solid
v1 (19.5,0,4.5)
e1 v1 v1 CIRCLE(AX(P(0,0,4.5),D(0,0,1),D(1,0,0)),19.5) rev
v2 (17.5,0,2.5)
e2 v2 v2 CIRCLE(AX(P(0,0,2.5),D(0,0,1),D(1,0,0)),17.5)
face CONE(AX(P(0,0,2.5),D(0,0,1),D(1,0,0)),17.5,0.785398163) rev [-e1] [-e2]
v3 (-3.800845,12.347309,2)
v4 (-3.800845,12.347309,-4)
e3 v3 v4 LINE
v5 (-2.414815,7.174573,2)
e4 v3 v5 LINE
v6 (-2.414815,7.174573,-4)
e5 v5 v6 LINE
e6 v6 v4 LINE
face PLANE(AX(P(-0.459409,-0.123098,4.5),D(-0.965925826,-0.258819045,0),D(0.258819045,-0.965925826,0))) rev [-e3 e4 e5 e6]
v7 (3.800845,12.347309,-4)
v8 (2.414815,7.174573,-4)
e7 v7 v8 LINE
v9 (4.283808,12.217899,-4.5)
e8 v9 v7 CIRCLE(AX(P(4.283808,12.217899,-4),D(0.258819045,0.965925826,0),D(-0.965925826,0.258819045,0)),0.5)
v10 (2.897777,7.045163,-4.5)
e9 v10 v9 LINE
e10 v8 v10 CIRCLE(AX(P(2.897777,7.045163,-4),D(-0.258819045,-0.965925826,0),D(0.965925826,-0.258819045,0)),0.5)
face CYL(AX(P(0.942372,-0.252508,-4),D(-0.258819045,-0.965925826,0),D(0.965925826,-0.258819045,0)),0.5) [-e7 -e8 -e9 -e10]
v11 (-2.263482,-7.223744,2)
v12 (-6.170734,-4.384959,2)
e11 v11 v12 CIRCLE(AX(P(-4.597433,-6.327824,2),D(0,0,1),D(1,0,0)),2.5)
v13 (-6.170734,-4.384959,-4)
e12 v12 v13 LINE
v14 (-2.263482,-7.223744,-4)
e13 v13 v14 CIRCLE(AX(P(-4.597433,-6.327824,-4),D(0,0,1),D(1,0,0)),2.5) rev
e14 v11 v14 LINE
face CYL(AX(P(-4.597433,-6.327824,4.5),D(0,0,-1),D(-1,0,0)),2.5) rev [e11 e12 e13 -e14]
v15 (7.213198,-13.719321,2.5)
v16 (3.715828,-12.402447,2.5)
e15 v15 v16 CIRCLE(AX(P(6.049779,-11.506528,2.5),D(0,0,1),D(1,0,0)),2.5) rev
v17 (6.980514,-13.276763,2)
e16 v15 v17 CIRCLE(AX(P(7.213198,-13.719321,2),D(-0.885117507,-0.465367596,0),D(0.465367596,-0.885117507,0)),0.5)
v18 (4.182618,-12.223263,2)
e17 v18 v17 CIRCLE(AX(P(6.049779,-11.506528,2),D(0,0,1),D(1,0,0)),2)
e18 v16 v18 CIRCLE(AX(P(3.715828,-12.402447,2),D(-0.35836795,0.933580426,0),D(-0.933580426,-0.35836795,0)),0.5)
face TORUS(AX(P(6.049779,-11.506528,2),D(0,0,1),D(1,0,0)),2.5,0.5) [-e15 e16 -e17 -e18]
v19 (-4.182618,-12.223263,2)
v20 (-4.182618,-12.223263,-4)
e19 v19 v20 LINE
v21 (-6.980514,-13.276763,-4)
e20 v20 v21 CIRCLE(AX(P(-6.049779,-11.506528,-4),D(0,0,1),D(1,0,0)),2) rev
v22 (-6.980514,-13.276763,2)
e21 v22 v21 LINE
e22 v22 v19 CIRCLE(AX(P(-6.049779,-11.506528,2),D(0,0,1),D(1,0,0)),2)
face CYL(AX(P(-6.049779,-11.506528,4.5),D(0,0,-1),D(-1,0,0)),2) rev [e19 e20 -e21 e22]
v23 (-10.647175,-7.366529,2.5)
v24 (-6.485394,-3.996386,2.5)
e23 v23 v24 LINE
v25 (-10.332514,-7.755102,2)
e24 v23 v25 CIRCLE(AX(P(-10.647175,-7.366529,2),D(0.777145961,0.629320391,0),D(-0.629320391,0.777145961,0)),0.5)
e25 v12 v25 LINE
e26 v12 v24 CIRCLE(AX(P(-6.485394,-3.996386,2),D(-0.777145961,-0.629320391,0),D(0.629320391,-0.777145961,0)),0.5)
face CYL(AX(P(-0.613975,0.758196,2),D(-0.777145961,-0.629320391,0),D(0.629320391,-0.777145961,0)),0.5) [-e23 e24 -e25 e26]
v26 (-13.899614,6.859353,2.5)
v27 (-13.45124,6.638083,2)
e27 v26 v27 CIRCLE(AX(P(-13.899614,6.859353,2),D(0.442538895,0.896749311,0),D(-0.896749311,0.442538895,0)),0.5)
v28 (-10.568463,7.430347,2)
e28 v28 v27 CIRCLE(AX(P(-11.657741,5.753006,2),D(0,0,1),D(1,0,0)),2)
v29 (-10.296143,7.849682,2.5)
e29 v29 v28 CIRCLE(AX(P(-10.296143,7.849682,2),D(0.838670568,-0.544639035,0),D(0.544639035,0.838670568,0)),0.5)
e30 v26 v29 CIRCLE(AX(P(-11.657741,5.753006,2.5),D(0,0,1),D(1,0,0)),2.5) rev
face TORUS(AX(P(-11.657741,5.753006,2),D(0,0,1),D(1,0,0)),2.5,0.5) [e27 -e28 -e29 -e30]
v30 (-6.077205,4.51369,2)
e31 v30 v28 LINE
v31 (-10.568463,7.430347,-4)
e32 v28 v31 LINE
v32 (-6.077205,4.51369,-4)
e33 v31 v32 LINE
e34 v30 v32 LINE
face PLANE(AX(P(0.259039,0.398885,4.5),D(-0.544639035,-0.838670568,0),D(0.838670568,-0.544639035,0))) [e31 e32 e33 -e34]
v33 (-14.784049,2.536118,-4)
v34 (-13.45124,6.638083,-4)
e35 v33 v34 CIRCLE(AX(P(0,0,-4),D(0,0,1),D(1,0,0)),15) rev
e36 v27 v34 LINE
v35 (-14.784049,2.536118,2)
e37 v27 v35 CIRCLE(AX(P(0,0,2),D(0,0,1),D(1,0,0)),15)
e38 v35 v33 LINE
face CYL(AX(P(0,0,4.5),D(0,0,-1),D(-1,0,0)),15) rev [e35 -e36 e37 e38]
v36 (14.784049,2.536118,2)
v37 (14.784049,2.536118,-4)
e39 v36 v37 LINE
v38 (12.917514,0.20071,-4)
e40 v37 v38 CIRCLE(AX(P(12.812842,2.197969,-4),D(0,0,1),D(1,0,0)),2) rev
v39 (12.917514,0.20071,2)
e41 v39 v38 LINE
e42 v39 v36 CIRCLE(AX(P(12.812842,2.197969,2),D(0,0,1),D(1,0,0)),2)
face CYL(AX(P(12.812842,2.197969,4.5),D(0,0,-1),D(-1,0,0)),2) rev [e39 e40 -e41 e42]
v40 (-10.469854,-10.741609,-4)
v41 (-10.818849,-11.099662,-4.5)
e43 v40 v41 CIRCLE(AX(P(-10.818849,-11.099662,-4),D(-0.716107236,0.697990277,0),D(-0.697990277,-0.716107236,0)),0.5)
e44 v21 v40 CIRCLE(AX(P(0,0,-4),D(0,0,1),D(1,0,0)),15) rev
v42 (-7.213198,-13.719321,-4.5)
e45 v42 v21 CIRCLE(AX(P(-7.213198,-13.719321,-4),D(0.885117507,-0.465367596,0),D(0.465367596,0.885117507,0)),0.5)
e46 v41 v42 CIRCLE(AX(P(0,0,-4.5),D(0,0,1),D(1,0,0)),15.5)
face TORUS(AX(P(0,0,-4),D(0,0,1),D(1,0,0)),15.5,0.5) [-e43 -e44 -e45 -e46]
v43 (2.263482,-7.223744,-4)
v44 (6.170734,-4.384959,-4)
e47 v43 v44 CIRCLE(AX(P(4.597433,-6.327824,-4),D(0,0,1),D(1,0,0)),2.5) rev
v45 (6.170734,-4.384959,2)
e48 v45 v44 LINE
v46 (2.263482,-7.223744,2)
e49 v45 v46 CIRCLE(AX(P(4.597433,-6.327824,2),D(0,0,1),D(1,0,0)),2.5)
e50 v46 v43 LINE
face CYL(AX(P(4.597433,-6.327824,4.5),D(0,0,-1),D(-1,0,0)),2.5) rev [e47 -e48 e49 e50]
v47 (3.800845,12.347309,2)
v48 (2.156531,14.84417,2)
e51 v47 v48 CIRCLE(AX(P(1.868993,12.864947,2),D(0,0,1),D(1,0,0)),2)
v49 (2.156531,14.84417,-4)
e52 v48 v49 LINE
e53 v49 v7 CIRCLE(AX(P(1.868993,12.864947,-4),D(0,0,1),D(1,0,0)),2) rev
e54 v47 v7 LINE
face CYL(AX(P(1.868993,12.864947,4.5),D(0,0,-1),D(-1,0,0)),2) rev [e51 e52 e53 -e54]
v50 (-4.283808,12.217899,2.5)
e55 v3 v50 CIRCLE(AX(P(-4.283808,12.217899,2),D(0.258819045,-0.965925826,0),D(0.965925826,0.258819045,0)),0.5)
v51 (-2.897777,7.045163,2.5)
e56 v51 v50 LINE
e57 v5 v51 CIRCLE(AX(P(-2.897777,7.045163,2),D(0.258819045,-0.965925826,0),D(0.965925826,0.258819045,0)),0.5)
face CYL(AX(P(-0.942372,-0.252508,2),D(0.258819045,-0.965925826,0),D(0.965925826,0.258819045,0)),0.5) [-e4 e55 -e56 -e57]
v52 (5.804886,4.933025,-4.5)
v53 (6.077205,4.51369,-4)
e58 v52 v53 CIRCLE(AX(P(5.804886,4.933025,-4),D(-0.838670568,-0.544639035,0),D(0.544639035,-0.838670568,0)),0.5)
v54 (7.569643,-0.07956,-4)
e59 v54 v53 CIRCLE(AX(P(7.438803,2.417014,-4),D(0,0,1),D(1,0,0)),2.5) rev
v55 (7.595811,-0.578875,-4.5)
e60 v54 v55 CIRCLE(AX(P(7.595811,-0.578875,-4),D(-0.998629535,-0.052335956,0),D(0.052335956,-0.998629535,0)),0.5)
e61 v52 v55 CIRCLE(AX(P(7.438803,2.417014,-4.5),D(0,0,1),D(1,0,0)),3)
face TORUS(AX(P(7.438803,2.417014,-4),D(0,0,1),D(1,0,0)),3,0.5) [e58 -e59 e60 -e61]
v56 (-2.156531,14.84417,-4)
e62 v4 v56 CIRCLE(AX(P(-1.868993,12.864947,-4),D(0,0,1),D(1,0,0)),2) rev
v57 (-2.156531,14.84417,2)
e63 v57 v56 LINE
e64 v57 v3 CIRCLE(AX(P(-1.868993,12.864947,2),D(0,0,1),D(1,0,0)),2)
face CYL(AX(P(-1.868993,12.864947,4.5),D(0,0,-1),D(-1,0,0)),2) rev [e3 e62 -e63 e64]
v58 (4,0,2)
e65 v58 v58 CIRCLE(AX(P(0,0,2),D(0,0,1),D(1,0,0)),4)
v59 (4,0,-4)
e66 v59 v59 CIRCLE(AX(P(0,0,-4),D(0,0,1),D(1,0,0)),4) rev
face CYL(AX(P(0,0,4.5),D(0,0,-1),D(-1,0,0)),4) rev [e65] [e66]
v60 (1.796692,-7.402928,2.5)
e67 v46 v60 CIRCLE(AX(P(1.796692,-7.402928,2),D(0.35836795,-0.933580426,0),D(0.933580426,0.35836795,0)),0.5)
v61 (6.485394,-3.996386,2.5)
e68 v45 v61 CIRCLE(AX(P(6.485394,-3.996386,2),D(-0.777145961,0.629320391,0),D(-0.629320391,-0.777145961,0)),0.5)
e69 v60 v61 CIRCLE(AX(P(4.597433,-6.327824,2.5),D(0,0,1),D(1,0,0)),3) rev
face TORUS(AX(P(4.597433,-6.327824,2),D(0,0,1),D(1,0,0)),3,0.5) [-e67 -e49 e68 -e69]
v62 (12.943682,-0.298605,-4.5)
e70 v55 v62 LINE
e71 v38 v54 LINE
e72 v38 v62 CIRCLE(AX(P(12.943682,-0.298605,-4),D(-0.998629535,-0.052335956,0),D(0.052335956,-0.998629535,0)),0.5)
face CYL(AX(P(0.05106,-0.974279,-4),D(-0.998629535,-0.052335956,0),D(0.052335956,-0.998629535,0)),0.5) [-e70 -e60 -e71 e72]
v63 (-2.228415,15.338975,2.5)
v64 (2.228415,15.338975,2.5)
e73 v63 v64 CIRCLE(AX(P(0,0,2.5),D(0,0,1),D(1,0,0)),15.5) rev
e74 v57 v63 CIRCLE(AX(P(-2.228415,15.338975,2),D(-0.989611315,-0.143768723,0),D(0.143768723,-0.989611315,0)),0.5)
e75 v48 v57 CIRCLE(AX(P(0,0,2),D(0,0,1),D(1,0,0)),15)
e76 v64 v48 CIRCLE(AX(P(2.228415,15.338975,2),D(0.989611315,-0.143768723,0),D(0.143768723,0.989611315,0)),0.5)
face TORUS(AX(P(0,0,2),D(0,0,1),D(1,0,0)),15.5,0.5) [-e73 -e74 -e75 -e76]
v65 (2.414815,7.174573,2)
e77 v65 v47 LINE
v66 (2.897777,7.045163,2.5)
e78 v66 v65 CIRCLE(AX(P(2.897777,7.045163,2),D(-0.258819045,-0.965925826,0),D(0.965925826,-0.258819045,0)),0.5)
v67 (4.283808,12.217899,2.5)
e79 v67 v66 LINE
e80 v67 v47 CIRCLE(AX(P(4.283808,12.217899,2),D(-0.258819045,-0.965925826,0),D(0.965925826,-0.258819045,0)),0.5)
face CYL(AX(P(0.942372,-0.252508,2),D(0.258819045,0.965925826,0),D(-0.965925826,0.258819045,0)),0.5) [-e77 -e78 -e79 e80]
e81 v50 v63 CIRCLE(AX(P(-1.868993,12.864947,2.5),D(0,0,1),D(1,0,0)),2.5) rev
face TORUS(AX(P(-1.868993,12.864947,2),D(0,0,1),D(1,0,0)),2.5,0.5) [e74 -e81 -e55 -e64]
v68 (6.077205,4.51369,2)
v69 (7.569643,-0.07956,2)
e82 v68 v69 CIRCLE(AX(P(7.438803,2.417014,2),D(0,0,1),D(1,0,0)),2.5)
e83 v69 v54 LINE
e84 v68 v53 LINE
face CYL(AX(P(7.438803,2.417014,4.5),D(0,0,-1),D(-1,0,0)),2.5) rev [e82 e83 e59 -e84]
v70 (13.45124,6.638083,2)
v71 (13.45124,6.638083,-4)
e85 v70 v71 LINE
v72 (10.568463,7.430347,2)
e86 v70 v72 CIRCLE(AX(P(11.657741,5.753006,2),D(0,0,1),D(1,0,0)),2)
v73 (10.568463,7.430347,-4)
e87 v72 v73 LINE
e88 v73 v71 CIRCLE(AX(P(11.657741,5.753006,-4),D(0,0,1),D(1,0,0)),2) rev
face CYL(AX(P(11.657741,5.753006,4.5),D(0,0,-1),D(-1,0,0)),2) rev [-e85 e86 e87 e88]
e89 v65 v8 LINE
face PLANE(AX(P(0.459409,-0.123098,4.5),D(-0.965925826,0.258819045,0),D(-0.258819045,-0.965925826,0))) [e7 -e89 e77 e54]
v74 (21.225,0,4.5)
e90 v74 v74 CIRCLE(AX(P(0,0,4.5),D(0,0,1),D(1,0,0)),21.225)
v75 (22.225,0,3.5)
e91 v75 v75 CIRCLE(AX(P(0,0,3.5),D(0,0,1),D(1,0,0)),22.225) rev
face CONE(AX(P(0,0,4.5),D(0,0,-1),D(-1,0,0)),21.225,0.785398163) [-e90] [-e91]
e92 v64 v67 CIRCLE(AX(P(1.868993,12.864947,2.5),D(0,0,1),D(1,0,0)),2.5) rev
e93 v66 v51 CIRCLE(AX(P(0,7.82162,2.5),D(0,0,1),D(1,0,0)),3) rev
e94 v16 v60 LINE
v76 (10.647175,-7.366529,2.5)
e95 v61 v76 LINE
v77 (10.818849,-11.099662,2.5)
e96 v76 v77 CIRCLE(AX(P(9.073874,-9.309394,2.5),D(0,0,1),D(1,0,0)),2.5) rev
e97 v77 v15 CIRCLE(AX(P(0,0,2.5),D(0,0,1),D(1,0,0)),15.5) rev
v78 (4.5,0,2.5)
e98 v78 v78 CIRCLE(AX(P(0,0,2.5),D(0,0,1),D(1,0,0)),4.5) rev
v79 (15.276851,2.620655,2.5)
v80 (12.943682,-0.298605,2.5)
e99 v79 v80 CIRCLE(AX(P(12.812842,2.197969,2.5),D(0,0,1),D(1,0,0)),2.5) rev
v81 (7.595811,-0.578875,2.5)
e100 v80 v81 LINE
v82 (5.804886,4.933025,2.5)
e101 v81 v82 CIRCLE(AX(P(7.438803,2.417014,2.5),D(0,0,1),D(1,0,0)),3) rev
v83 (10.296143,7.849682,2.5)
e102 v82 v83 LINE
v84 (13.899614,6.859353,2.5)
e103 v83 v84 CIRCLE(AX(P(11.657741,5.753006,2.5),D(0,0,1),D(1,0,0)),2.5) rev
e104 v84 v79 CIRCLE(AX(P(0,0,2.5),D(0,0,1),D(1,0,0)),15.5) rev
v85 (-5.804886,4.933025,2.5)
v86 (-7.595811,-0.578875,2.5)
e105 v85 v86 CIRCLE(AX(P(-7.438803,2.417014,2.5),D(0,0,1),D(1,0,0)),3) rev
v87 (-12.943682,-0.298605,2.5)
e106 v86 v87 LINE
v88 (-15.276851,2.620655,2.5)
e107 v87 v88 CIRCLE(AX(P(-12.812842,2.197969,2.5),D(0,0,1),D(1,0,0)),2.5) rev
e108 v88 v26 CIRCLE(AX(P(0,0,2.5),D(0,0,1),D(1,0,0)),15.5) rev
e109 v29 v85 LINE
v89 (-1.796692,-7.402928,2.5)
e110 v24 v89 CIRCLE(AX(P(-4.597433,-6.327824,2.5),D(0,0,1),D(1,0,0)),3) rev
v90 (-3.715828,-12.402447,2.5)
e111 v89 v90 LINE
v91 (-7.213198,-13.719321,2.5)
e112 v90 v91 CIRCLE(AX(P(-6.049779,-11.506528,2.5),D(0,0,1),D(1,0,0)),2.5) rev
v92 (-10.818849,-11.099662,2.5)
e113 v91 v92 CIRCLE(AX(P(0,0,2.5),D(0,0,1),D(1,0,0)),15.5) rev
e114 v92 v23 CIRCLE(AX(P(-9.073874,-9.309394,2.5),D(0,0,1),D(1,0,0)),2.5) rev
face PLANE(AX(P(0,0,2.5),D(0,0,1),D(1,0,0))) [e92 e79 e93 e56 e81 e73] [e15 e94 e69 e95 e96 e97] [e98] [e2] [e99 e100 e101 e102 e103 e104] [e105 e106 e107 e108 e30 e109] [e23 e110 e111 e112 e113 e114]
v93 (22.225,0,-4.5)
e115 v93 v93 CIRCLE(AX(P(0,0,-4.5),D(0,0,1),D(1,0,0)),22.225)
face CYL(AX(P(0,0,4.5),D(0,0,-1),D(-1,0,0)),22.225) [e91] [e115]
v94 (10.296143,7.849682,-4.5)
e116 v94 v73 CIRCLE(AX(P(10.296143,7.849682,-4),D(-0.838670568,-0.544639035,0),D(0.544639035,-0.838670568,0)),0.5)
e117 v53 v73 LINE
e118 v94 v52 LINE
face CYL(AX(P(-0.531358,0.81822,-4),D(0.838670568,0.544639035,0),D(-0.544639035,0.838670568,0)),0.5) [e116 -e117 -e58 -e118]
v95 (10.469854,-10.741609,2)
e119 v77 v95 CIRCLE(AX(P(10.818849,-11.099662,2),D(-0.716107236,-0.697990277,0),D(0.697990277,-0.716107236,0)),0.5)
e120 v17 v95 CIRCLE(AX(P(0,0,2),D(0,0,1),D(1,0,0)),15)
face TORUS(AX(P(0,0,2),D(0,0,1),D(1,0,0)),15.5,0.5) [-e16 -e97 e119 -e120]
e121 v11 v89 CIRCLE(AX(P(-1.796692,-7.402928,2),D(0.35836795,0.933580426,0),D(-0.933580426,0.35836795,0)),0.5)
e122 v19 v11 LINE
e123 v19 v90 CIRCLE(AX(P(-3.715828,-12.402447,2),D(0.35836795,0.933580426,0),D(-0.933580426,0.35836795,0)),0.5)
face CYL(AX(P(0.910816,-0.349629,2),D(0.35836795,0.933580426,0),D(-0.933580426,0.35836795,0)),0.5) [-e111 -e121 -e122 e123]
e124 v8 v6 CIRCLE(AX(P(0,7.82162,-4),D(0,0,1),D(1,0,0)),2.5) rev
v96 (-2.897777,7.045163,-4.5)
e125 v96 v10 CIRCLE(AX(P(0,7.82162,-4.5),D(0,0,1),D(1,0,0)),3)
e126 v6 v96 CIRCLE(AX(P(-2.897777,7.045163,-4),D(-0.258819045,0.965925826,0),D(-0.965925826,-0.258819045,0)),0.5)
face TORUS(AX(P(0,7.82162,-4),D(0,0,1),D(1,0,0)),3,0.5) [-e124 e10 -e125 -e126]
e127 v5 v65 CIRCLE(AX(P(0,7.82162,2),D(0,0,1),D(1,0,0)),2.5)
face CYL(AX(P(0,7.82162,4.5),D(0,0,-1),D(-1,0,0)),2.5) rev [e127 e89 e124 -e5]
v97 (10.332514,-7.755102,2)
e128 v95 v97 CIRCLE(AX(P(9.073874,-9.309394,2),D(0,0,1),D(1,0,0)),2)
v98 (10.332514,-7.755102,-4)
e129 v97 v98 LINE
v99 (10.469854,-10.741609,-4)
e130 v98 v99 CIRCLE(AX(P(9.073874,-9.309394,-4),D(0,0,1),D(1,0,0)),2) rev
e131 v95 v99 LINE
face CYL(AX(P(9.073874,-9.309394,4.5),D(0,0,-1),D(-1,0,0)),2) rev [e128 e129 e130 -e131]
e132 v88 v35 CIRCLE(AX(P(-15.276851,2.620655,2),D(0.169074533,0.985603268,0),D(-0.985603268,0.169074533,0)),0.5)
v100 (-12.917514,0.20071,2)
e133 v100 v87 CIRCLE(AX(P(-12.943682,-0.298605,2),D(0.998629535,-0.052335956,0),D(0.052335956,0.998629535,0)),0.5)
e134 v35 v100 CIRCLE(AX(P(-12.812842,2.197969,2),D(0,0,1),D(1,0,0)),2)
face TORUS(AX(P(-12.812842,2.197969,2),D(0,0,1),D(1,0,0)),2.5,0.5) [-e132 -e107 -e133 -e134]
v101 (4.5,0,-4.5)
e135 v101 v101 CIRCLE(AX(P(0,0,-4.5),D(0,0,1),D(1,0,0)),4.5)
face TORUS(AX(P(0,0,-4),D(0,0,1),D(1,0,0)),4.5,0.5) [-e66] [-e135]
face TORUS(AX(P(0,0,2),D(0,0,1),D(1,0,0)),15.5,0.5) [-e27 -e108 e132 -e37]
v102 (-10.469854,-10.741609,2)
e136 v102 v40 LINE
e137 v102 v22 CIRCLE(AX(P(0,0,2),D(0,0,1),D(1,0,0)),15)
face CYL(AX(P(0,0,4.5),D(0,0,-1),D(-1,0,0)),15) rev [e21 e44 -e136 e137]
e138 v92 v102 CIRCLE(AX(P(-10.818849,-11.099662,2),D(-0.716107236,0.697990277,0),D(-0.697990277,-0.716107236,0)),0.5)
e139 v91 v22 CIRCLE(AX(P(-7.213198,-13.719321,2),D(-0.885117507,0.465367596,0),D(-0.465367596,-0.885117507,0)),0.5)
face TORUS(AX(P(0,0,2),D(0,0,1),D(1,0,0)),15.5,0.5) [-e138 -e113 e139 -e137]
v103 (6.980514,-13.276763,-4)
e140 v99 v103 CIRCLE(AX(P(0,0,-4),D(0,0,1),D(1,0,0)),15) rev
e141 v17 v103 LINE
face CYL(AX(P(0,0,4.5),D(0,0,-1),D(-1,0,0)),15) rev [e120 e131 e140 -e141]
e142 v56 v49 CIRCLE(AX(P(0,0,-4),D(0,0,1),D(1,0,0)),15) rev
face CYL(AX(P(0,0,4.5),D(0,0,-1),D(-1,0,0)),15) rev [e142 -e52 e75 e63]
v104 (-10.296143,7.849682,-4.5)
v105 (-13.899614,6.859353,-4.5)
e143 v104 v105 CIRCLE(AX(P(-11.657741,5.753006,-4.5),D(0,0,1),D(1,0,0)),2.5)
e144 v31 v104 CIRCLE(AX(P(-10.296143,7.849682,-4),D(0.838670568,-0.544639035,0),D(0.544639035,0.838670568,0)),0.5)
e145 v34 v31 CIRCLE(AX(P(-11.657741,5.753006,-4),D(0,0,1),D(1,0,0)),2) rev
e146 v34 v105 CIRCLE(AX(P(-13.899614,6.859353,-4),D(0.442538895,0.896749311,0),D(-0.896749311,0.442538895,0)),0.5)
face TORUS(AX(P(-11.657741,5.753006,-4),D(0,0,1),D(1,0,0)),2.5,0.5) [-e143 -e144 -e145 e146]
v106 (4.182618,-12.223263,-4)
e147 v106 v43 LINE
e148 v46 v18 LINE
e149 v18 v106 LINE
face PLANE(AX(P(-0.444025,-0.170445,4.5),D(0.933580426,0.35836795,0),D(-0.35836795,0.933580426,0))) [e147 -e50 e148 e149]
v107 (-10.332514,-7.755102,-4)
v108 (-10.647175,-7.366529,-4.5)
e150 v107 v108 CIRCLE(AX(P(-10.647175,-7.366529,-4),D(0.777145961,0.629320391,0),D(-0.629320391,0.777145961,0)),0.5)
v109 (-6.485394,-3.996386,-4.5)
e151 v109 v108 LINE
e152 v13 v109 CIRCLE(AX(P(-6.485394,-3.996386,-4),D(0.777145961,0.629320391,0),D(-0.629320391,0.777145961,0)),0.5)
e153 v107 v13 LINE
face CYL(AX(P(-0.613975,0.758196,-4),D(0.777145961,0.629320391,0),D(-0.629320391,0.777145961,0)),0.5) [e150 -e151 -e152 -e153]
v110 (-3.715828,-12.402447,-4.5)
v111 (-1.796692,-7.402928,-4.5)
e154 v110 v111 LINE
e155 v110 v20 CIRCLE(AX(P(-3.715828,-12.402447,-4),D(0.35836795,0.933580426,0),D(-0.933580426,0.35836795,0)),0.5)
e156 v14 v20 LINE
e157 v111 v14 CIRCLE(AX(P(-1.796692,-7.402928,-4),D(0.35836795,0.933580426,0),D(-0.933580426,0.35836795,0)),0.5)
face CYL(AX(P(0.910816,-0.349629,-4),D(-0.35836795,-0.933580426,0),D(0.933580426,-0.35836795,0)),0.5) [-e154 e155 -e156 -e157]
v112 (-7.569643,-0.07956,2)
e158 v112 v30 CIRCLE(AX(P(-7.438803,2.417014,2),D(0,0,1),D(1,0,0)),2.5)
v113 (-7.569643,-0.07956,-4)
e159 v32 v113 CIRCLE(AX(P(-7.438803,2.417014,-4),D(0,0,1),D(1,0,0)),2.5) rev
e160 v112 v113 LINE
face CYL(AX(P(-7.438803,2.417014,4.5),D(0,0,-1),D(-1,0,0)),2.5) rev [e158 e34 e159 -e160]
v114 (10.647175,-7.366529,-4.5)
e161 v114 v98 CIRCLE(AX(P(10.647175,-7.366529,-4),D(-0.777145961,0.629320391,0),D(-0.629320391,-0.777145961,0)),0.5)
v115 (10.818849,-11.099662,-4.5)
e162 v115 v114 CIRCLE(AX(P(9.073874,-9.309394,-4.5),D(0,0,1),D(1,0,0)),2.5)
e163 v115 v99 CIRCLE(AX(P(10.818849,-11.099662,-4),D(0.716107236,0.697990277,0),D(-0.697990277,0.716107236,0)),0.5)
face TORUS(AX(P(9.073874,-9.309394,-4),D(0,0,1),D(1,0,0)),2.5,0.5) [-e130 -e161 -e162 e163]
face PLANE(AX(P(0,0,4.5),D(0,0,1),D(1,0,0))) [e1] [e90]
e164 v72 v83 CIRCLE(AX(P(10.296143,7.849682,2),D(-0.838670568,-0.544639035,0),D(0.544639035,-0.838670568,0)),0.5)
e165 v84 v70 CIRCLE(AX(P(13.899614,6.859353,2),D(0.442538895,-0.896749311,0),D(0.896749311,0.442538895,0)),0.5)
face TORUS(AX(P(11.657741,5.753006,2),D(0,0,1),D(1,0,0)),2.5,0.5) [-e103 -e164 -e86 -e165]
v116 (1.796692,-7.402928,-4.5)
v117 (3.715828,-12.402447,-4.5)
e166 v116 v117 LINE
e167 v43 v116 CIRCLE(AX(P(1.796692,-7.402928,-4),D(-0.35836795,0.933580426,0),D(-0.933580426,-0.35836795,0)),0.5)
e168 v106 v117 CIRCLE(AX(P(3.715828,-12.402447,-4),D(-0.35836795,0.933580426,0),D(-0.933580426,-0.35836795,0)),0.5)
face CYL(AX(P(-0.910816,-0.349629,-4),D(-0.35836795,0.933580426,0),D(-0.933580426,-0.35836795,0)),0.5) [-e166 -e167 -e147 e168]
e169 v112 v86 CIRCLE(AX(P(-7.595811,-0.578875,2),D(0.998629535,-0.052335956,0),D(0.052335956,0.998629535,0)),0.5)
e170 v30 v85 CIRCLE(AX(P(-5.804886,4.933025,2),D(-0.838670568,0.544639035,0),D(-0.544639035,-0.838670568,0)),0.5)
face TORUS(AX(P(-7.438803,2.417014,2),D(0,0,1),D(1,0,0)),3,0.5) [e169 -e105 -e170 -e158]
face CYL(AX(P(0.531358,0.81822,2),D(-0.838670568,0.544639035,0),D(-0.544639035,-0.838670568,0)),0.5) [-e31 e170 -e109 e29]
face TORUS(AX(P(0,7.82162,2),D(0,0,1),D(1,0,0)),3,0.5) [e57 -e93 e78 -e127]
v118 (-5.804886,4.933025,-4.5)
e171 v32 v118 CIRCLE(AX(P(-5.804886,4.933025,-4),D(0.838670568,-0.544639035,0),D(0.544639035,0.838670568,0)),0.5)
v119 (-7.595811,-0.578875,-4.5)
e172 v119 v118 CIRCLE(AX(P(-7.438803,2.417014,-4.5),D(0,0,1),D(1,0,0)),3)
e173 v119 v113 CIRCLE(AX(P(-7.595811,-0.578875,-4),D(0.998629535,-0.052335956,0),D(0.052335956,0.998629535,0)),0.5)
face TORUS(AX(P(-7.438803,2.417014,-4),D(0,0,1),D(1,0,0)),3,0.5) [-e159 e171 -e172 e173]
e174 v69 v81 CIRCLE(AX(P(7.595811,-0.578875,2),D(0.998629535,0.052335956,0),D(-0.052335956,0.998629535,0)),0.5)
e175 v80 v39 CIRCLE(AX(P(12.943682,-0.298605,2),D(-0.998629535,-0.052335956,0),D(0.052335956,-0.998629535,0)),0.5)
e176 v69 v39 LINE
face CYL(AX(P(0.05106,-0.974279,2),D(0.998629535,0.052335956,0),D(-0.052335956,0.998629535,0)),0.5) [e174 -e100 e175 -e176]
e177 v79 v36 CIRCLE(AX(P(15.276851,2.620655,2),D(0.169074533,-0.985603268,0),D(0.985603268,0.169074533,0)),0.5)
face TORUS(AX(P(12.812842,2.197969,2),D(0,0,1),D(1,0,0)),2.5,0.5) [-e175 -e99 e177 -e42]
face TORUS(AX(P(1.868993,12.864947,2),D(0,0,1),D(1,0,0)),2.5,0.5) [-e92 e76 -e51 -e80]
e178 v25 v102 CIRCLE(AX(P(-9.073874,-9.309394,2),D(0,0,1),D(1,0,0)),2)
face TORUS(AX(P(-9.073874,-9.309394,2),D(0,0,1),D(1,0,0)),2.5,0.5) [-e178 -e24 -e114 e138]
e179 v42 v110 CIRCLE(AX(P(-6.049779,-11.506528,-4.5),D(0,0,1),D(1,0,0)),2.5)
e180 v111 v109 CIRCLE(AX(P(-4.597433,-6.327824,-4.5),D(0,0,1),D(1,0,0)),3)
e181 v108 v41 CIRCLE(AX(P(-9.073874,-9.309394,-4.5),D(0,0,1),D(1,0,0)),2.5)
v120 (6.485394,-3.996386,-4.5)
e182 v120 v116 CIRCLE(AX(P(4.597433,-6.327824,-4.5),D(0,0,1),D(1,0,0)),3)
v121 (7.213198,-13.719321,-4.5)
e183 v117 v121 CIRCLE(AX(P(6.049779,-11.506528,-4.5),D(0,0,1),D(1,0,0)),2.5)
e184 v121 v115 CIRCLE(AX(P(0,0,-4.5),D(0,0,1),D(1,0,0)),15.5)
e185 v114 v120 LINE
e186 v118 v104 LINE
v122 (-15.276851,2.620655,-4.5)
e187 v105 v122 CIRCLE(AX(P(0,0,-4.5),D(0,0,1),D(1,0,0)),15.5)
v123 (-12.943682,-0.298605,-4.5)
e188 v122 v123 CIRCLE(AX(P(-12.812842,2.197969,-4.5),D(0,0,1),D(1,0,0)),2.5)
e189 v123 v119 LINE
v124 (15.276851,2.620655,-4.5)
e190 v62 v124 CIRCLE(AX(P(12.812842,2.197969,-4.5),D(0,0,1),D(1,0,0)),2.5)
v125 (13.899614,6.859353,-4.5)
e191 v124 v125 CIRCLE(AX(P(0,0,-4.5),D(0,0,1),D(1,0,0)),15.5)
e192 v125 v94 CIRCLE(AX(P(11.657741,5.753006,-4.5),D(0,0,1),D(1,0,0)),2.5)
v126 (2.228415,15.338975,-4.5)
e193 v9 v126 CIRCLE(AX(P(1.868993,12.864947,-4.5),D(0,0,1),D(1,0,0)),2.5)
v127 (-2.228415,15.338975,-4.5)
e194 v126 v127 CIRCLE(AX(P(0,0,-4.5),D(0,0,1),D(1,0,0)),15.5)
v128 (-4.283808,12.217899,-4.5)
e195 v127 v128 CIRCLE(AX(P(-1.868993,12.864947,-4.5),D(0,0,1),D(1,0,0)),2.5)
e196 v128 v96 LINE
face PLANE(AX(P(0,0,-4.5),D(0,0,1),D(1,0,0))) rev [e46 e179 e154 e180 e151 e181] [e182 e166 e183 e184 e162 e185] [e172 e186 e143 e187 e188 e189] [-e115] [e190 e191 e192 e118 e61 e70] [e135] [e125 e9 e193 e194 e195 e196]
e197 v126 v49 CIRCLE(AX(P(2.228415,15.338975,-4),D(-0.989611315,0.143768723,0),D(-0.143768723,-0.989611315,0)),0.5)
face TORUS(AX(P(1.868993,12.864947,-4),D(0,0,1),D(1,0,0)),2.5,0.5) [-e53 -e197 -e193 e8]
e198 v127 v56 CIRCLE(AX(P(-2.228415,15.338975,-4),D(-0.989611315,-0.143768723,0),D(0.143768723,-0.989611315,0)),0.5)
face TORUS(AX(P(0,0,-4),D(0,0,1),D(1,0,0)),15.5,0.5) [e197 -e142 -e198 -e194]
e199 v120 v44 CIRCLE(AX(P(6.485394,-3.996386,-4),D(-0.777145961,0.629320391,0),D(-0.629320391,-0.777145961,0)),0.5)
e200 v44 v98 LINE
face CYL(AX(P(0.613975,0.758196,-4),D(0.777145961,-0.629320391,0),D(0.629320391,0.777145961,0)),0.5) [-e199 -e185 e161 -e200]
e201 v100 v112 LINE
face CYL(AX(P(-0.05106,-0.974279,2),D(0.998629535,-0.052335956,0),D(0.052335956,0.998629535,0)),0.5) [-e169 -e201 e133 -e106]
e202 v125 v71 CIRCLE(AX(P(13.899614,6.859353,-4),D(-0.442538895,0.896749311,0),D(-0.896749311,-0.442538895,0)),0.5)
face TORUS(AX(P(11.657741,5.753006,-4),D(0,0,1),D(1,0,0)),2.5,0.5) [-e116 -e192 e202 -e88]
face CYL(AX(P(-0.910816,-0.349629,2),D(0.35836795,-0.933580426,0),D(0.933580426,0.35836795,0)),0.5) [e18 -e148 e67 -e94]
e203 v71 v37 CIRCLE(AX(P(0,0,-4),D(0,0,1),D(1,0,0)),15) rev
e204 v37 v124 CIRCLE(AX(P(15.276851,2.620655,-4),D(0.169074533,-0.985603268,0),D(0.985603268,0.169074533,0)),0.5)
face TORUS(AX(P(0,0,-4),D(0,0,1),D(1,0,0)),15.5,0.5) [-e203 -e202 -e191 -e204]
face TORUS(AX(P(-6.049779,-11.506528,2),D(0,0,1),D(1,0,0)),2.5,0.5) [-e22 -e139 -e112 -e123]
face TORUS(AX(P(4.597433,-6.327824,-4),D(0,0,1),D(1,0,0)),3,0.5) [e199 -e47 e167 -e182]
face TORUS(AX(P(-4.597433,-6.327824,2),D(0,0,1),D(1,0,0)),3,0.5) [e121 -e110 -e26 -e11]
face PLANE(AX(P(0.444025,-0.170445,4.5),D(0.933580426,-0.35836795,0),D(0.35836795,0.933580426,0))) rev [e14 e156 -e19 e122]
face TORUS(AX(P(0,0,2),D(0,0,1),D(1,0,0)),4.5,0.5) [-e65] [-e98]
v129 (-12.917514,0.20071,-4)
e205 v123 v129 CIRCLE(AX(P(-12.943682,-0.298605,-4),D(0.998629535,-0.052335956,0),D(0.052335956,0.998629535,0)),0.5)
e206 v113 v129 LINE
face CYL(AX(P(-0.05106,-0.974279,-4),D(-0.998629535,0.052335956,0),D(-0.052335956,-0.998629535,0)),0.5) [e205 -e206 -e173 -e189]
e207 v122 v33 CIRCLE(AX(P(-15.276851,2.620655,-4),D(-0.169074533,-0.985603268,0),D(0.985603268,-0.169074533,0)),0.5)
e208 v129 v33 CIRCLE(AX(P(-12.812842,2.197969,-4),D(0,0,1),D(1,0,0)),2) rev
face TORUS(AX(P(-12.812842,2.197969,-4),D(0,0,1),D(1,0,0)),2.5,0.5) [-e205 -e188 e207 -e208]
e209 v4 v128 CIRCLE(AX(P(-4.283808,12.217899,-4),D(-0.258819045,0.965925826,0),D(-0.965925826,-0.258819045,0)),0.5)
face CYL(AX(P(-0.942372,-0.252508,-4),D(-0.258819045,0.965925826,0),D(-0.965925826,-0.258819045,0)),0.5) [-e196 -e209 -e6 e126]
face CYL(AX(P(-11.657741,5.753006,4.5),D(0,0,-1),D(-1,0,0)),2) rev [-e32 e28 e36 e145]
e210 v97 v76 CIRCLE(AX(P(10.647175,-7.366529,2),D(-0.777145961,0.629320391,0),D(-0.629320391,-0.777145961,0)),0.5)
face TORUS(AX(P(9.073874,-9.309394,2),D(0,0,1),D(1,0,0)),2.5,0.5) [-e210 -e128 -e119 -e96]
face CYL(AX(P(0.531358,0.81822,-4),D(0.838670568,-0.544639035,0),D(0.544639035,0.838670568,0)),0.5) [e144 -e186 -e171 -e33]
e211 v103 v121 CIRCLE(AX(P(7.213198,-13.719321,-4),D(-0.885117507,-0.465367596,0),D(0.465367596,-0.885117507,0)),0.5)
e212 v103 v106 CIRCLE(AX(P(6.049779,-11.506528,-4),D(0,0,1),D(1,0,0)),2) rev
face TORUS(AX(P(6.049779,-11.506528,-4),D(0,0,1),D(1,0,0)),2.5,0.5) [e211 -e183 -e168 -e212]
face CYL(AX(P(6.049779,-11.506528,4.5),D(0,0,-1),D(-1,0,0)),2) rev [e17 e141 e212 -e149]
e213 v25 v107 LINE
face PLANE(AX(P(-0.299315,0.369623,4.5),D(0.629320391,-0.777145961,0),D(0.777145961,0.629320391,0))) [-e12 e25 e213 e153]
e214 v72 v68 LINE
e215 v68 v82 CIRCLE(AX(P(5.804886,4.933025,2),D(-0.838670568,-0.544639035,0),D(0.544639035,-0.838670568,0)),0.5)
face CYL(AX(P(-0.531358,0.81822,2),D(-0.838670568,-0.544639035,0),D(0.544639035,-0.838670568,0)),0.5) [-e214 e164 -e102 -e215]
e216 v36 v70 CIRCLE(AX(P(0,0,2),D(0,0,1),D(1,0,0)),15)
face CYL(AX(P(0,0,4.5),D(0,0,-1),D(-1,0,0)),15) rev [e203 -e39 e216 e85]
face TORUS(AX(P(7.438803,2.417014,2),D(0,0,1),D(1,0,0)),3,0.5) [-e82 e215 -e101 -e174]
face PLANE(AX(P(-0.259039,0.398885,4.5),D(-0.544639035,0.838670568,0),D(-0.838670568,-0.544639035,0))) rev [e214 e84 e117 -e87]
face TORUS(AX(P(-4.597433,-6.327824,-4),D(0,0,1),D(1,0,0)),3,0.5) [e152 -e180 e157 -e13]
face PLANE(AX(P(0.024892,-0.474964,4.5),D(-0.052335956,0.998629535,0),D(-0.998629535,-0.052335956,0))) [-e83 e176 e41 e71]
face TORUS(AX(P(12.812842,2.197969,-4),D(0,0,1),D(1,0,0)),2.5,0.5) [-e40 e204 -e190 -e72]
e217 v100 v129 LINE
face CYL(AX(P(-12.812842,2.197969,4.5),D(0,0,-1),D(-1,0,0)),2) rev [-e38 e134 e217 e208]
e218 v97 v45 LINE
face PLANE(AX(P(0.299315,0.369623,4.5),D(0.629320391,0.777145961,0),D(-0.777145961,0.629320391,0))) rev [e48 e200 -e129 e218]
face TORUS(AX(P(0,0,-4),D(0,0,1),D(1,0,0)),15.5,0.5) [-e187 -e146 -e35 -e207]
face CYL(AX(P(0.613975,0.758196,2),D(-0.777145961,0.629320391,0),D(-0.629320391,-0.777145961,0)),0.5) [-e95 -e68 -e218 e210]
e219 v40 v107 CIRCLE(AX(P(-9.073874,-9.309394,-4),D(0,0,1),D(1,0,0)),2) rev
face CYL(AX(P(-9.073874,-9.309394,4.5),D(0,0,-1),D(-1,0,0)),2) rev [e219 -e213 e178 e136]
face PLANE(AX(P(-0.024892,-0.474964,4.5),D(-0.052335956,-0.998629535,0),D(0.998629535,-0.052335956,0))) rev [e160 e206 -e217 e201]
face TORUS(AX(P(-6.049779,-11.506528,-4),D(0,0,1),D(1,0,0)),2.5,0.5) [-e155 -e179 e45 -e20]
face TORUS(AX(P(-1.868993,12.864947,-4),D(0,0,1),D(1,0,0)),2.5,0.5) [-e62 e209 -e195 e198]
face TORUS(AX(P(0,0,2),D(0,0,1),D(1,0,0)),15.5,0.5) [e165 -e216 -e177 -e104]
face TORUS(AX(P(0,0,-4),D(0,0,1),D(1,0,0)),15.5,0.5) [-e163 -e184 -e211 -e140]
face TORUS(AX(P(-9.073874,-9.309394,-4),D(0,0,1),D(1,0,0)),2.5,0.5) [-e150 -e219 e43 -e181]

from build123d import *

# Parameters (mm, degrees)
SKETCH1_R           = 22.225
SKETCH1_R_2         = 4
BOSS_EXTRUDE1_DEPTH = 4.5
SKETCH2_R           = 17.5
CUT_EXTRUDE1_DEPTH  = 2
CHAMFER1_SIZE       = 2
CHAMFER2_SIZE       = 1
FILLET4_R           = 0.5


with BuildPart() as part:
    # Sketch1 → Boss-Extrude1 (new, symmetric)
    with BuildSketch(Plane.XY):
        Circle(SKETCH1_R)
        Circle(SKETCH1_R_2, mode=Mode.SUBTRACT)
        with BuildLine():
            Line((-2.414814566, 7.174572795), (-3.800845055, 12.347309001))
            ThreePointArc((-3.800845055, 12.347309001), (-3.539322818, 13.964946929), (-2.156530849, 14.844169721))
            ThreePointArc((-2.156530849, 14.844169721), (0, 15), (2.156530849, 14.844169721))
            ThreePointArc((2.156530849, 14.844169721), (3.539322818, 13.964946929), (3.800845055, 12.347309001))
            Line((3.800845055, 12.347309001), (2.414814566, 7.174572795))
            ThreePointArc((2.414814566, 7.174572795), (0, 5.321620408), (-2.414814566, 7.174572795))
        make_face(mode=Mode.SUBTRACT)
        with BuildLine():
            Line((7.569642947, -0.079560207), (12.917514399, 0.200709859))
            ThreePointArc((12.917514399, 0.200709859), (14.375164676, 0.949309897), (14.784049023, 2.536117995))
            ThreePointArc((14.784049023, 2.536117995), (14.265847744, 4.635254916), (13.451239661, 6.638083427))
            ThreePointArc((13.451239661, 6.638083427), (12.187742877, 7.681501956), (10.568462969, 7.430346773))
            Line((10.568462969, 7.430346773), (6.077205469, 4.513690049))
            ThreePointArc((6.077205469, 4.513690049), (5.061161766, 1.644471144), (7.569642947, -0.079560207))
        make_face(mode=Mode.SUBTRACT)
        with BuildLine():
            Line((2.263482058, -7.223743707), (4.182617894, -12.223263486))
            ThreePointArc((4.182617894, -12.223263486), (5.345017546, -13.378241147), (6.980513939, -13.2767626))
            ThreePointArc((6.980513939, -13.2767626), (8.816778784, -12.135254916), (10.46985415, -10.741608542))
            ThreePointArc((10.46985415, -10.741608542), (11.071762162, -9.217517636), (10.332514379, -7.755102147))
            Line((10.332514379, -7.755102147), (6.170734102, -4.38495893))
            ThreePointArc((6.170734102, -4.38495893), (3.127969994, -4.305281347), (2.263482058, -7.223743707))
        make_face(mode=Mode.SUBTRACT)
        with BuildLine():
            Line((-6.170734102, -4.38495893), (-10.332514379, -7.755102147))
            ThreePointArc((-10.332514379, -7.755102147), (-11.071762162, -9.217517636), (-10.46985415, -10.741608542))
            ThreePointArc((-10.46985415, -10.741608542), (-8.816778784, -12.135254916), (-6.980513939, -13.2767626))
            ThreePointArc((-6.980513939, -13.2767626), (-5.345017546, -13.378241147), (-4.182617894, -12.223263486))
            Line((-4.182617894, -12.223263486), (-2.263482058, -7.223743707))
            ThreePointArc((-2.263482058, -7.223743707), (-3.127969994, -4.305281347), (-6.170734102, -4.38495893))
        make_face(mode=Mode.SUBTRACT)
        with BuildLine():
            Line((-6.077205469, 4.513690049), (-10.568462969, 7.430346773))
            ThreePointArc((-10.568462969, 7.430346773), (-12.187742877, 7.681501956), (-13.451239661, 6.638083427))
            ThreePointArc((-13.451239661, 6.638083427), (-14.265847744, 4.635254916), (-14.784049023, 2.536117995))
            ThreePointArc((-14.784049023, 2.536117995), (-14.375164676, 0.949309897), (-12.917514399, 0.200709859))
            Line((-12.917514399, 0.200709859), (-7.569642947, -0.079560207))
            ThreePointArc((-7.569642947, -0.079560207), (-5.061161766, 1.644471144), (-6.077205469, 4.513690049))
        make_face(mode=Mode.SUBTRACT)
    extrude(amount=BOSS_EXTRUDE1_DEPTH, both=True)

    # Sketch2 → Cut-Extrude1 (cut)
    with BuildSketch(Plane.XY.offset(4.5)):
        Circle(SKETCH2_R)
    extrude(amount=-CUT_EXTRUDE1_DEPTH, mode=Mode.SUBTRACT)

    # Chamfer1
    chamfer1_edges = [part.edges().sort_by_distance(p)[0] for p in [
        (-17.5, 0, 4.5),
    ]]
    chamfer(chamfer1_edges, length=CHAMFER1_SIZE - 0.0001)  # a hair under: the kernel refuses the full size

    # Chamfer2
    chamfer2_edges = [part.edges().sort_by_distance(p)[0] for p in [
        (-22.225, 0, 4.5),
    ]]
    chamfer(chamfer2_edges, length=CHAMFER2_SIZE)

    # Fillet4
    fillet4_edges = [part.edges().sort_by_distance(p)[0] for p in [
        (-3.127969994, -4.305281347, 2.5),
        (-3.223049976, -9.723503597, 2.5),
        (-5.345017546, -13.378241147, 2.5),
        (3.127969994, -4.305281347, 2.5),
        (8.25162424, -6.070030538, 2.5),
        (11.071762162, -9.217517636, 2.5),
        (5.061161766, 1.644471144, 2.5),
        (8.322834219, 5.972018411, 2.5),
        (12.187742877, 7.681501956, 2.5),
        (-8.25162424, -6.070030538, 2.5),
        (-11.071762162, -9.217517636, 2.5),
        (-8.816778784, -12.135254916, 2.5),
        (3.223049976, -9.723503597, 2.5),
        (5.345017546, -13.378241147, 2.5),
        (8.816778784, -12.135254916, 2.5),
        (10.243578673, 0.060574826, 2.5),
        (14.375164676, 0.949309897, 2.5),
        (14.265847744, 4.635254916, 2.5),
        (-8.322834219, 5.972018411, 2.5),
        (-14.265847744, 4.635254916, 2.5),
        (-4, 0, 2.5),
        (3.10782981, 9.760940898, 2.5),
        (3.539322818, 13.964946929, 2.5),
        (0, 15, 2.5),
        (-5.061161766, 1.644471144, 2.5),
        (-10.243578673, 0.060574826, 2.5),
        (-14.375164676, 0.949309897, 2.5),
        (0, 5.321620408, 2.5),
        (-3.10782981, 9.760940898, 2.5),
        (-3.539322818, 13.964946929, 2.5),
        (-12.187742877, 7.681501956, -4.5),
        (-14.265847744, 4.635254916, -4.5),
        (-14.375164676, 0.949309897, -4.5),
        (-10.243578673, 0.060574826, -4.5),
        (-5.061161766, 1.644471144, -4.5),
        (-8.322834219, 5.972018411, -4.5),
        (-11.071762162, -9.217517636, -4.5),
        (-8.816778784, -12.135254916, -4.5),
        (-5.345017546, -13.378241147, -4.5),
        (-3.223049976, -9.723503597, -4.5),
        (-3.127969994, -4.305281347, -4.5),
        (-8.25162424, -6.070030538, -4.5),
        (5.345017546, -13.378241147, -4.5),
        (8.816778784, -12.135254916, -4.5),
        (11.071762162, -9.217517636, -4.5),
        (8.25162424, -6.070030538, -4.5),
        (3.127969994, -4.305281347, -4.5),
        (3.223049976, -9.723503597, -4.5),
        (14.375164676, 0.949309897, -4.5),
        (14.265847744, 4.635254916, -4.5),
        (12.187742877, 7.681501956, -4.5),
        (8.322834219, 5.972018411, -4.5),
        (5.061161766, 1.644471144, -4.5),
        (10.243578673, 0.060574826, -4.5),
        (0, 5.321620408, -4.5),
        (3.10782981, 9.760940898, -4.5),
        (3.539322818, 13.964946929, -4.5),
        (0, 15, -4.5),
        (-3.539322818, 13.964946929, -4.5),
        (-3.10782981, 9.760940898, -4.5),
        (-4, 0, -4.5),
        (-12.187742877, 7.681501956, 2.5),
    ]]
    fillet(fillet4_edges, radius=FILLET4_R)


solid = part.part
